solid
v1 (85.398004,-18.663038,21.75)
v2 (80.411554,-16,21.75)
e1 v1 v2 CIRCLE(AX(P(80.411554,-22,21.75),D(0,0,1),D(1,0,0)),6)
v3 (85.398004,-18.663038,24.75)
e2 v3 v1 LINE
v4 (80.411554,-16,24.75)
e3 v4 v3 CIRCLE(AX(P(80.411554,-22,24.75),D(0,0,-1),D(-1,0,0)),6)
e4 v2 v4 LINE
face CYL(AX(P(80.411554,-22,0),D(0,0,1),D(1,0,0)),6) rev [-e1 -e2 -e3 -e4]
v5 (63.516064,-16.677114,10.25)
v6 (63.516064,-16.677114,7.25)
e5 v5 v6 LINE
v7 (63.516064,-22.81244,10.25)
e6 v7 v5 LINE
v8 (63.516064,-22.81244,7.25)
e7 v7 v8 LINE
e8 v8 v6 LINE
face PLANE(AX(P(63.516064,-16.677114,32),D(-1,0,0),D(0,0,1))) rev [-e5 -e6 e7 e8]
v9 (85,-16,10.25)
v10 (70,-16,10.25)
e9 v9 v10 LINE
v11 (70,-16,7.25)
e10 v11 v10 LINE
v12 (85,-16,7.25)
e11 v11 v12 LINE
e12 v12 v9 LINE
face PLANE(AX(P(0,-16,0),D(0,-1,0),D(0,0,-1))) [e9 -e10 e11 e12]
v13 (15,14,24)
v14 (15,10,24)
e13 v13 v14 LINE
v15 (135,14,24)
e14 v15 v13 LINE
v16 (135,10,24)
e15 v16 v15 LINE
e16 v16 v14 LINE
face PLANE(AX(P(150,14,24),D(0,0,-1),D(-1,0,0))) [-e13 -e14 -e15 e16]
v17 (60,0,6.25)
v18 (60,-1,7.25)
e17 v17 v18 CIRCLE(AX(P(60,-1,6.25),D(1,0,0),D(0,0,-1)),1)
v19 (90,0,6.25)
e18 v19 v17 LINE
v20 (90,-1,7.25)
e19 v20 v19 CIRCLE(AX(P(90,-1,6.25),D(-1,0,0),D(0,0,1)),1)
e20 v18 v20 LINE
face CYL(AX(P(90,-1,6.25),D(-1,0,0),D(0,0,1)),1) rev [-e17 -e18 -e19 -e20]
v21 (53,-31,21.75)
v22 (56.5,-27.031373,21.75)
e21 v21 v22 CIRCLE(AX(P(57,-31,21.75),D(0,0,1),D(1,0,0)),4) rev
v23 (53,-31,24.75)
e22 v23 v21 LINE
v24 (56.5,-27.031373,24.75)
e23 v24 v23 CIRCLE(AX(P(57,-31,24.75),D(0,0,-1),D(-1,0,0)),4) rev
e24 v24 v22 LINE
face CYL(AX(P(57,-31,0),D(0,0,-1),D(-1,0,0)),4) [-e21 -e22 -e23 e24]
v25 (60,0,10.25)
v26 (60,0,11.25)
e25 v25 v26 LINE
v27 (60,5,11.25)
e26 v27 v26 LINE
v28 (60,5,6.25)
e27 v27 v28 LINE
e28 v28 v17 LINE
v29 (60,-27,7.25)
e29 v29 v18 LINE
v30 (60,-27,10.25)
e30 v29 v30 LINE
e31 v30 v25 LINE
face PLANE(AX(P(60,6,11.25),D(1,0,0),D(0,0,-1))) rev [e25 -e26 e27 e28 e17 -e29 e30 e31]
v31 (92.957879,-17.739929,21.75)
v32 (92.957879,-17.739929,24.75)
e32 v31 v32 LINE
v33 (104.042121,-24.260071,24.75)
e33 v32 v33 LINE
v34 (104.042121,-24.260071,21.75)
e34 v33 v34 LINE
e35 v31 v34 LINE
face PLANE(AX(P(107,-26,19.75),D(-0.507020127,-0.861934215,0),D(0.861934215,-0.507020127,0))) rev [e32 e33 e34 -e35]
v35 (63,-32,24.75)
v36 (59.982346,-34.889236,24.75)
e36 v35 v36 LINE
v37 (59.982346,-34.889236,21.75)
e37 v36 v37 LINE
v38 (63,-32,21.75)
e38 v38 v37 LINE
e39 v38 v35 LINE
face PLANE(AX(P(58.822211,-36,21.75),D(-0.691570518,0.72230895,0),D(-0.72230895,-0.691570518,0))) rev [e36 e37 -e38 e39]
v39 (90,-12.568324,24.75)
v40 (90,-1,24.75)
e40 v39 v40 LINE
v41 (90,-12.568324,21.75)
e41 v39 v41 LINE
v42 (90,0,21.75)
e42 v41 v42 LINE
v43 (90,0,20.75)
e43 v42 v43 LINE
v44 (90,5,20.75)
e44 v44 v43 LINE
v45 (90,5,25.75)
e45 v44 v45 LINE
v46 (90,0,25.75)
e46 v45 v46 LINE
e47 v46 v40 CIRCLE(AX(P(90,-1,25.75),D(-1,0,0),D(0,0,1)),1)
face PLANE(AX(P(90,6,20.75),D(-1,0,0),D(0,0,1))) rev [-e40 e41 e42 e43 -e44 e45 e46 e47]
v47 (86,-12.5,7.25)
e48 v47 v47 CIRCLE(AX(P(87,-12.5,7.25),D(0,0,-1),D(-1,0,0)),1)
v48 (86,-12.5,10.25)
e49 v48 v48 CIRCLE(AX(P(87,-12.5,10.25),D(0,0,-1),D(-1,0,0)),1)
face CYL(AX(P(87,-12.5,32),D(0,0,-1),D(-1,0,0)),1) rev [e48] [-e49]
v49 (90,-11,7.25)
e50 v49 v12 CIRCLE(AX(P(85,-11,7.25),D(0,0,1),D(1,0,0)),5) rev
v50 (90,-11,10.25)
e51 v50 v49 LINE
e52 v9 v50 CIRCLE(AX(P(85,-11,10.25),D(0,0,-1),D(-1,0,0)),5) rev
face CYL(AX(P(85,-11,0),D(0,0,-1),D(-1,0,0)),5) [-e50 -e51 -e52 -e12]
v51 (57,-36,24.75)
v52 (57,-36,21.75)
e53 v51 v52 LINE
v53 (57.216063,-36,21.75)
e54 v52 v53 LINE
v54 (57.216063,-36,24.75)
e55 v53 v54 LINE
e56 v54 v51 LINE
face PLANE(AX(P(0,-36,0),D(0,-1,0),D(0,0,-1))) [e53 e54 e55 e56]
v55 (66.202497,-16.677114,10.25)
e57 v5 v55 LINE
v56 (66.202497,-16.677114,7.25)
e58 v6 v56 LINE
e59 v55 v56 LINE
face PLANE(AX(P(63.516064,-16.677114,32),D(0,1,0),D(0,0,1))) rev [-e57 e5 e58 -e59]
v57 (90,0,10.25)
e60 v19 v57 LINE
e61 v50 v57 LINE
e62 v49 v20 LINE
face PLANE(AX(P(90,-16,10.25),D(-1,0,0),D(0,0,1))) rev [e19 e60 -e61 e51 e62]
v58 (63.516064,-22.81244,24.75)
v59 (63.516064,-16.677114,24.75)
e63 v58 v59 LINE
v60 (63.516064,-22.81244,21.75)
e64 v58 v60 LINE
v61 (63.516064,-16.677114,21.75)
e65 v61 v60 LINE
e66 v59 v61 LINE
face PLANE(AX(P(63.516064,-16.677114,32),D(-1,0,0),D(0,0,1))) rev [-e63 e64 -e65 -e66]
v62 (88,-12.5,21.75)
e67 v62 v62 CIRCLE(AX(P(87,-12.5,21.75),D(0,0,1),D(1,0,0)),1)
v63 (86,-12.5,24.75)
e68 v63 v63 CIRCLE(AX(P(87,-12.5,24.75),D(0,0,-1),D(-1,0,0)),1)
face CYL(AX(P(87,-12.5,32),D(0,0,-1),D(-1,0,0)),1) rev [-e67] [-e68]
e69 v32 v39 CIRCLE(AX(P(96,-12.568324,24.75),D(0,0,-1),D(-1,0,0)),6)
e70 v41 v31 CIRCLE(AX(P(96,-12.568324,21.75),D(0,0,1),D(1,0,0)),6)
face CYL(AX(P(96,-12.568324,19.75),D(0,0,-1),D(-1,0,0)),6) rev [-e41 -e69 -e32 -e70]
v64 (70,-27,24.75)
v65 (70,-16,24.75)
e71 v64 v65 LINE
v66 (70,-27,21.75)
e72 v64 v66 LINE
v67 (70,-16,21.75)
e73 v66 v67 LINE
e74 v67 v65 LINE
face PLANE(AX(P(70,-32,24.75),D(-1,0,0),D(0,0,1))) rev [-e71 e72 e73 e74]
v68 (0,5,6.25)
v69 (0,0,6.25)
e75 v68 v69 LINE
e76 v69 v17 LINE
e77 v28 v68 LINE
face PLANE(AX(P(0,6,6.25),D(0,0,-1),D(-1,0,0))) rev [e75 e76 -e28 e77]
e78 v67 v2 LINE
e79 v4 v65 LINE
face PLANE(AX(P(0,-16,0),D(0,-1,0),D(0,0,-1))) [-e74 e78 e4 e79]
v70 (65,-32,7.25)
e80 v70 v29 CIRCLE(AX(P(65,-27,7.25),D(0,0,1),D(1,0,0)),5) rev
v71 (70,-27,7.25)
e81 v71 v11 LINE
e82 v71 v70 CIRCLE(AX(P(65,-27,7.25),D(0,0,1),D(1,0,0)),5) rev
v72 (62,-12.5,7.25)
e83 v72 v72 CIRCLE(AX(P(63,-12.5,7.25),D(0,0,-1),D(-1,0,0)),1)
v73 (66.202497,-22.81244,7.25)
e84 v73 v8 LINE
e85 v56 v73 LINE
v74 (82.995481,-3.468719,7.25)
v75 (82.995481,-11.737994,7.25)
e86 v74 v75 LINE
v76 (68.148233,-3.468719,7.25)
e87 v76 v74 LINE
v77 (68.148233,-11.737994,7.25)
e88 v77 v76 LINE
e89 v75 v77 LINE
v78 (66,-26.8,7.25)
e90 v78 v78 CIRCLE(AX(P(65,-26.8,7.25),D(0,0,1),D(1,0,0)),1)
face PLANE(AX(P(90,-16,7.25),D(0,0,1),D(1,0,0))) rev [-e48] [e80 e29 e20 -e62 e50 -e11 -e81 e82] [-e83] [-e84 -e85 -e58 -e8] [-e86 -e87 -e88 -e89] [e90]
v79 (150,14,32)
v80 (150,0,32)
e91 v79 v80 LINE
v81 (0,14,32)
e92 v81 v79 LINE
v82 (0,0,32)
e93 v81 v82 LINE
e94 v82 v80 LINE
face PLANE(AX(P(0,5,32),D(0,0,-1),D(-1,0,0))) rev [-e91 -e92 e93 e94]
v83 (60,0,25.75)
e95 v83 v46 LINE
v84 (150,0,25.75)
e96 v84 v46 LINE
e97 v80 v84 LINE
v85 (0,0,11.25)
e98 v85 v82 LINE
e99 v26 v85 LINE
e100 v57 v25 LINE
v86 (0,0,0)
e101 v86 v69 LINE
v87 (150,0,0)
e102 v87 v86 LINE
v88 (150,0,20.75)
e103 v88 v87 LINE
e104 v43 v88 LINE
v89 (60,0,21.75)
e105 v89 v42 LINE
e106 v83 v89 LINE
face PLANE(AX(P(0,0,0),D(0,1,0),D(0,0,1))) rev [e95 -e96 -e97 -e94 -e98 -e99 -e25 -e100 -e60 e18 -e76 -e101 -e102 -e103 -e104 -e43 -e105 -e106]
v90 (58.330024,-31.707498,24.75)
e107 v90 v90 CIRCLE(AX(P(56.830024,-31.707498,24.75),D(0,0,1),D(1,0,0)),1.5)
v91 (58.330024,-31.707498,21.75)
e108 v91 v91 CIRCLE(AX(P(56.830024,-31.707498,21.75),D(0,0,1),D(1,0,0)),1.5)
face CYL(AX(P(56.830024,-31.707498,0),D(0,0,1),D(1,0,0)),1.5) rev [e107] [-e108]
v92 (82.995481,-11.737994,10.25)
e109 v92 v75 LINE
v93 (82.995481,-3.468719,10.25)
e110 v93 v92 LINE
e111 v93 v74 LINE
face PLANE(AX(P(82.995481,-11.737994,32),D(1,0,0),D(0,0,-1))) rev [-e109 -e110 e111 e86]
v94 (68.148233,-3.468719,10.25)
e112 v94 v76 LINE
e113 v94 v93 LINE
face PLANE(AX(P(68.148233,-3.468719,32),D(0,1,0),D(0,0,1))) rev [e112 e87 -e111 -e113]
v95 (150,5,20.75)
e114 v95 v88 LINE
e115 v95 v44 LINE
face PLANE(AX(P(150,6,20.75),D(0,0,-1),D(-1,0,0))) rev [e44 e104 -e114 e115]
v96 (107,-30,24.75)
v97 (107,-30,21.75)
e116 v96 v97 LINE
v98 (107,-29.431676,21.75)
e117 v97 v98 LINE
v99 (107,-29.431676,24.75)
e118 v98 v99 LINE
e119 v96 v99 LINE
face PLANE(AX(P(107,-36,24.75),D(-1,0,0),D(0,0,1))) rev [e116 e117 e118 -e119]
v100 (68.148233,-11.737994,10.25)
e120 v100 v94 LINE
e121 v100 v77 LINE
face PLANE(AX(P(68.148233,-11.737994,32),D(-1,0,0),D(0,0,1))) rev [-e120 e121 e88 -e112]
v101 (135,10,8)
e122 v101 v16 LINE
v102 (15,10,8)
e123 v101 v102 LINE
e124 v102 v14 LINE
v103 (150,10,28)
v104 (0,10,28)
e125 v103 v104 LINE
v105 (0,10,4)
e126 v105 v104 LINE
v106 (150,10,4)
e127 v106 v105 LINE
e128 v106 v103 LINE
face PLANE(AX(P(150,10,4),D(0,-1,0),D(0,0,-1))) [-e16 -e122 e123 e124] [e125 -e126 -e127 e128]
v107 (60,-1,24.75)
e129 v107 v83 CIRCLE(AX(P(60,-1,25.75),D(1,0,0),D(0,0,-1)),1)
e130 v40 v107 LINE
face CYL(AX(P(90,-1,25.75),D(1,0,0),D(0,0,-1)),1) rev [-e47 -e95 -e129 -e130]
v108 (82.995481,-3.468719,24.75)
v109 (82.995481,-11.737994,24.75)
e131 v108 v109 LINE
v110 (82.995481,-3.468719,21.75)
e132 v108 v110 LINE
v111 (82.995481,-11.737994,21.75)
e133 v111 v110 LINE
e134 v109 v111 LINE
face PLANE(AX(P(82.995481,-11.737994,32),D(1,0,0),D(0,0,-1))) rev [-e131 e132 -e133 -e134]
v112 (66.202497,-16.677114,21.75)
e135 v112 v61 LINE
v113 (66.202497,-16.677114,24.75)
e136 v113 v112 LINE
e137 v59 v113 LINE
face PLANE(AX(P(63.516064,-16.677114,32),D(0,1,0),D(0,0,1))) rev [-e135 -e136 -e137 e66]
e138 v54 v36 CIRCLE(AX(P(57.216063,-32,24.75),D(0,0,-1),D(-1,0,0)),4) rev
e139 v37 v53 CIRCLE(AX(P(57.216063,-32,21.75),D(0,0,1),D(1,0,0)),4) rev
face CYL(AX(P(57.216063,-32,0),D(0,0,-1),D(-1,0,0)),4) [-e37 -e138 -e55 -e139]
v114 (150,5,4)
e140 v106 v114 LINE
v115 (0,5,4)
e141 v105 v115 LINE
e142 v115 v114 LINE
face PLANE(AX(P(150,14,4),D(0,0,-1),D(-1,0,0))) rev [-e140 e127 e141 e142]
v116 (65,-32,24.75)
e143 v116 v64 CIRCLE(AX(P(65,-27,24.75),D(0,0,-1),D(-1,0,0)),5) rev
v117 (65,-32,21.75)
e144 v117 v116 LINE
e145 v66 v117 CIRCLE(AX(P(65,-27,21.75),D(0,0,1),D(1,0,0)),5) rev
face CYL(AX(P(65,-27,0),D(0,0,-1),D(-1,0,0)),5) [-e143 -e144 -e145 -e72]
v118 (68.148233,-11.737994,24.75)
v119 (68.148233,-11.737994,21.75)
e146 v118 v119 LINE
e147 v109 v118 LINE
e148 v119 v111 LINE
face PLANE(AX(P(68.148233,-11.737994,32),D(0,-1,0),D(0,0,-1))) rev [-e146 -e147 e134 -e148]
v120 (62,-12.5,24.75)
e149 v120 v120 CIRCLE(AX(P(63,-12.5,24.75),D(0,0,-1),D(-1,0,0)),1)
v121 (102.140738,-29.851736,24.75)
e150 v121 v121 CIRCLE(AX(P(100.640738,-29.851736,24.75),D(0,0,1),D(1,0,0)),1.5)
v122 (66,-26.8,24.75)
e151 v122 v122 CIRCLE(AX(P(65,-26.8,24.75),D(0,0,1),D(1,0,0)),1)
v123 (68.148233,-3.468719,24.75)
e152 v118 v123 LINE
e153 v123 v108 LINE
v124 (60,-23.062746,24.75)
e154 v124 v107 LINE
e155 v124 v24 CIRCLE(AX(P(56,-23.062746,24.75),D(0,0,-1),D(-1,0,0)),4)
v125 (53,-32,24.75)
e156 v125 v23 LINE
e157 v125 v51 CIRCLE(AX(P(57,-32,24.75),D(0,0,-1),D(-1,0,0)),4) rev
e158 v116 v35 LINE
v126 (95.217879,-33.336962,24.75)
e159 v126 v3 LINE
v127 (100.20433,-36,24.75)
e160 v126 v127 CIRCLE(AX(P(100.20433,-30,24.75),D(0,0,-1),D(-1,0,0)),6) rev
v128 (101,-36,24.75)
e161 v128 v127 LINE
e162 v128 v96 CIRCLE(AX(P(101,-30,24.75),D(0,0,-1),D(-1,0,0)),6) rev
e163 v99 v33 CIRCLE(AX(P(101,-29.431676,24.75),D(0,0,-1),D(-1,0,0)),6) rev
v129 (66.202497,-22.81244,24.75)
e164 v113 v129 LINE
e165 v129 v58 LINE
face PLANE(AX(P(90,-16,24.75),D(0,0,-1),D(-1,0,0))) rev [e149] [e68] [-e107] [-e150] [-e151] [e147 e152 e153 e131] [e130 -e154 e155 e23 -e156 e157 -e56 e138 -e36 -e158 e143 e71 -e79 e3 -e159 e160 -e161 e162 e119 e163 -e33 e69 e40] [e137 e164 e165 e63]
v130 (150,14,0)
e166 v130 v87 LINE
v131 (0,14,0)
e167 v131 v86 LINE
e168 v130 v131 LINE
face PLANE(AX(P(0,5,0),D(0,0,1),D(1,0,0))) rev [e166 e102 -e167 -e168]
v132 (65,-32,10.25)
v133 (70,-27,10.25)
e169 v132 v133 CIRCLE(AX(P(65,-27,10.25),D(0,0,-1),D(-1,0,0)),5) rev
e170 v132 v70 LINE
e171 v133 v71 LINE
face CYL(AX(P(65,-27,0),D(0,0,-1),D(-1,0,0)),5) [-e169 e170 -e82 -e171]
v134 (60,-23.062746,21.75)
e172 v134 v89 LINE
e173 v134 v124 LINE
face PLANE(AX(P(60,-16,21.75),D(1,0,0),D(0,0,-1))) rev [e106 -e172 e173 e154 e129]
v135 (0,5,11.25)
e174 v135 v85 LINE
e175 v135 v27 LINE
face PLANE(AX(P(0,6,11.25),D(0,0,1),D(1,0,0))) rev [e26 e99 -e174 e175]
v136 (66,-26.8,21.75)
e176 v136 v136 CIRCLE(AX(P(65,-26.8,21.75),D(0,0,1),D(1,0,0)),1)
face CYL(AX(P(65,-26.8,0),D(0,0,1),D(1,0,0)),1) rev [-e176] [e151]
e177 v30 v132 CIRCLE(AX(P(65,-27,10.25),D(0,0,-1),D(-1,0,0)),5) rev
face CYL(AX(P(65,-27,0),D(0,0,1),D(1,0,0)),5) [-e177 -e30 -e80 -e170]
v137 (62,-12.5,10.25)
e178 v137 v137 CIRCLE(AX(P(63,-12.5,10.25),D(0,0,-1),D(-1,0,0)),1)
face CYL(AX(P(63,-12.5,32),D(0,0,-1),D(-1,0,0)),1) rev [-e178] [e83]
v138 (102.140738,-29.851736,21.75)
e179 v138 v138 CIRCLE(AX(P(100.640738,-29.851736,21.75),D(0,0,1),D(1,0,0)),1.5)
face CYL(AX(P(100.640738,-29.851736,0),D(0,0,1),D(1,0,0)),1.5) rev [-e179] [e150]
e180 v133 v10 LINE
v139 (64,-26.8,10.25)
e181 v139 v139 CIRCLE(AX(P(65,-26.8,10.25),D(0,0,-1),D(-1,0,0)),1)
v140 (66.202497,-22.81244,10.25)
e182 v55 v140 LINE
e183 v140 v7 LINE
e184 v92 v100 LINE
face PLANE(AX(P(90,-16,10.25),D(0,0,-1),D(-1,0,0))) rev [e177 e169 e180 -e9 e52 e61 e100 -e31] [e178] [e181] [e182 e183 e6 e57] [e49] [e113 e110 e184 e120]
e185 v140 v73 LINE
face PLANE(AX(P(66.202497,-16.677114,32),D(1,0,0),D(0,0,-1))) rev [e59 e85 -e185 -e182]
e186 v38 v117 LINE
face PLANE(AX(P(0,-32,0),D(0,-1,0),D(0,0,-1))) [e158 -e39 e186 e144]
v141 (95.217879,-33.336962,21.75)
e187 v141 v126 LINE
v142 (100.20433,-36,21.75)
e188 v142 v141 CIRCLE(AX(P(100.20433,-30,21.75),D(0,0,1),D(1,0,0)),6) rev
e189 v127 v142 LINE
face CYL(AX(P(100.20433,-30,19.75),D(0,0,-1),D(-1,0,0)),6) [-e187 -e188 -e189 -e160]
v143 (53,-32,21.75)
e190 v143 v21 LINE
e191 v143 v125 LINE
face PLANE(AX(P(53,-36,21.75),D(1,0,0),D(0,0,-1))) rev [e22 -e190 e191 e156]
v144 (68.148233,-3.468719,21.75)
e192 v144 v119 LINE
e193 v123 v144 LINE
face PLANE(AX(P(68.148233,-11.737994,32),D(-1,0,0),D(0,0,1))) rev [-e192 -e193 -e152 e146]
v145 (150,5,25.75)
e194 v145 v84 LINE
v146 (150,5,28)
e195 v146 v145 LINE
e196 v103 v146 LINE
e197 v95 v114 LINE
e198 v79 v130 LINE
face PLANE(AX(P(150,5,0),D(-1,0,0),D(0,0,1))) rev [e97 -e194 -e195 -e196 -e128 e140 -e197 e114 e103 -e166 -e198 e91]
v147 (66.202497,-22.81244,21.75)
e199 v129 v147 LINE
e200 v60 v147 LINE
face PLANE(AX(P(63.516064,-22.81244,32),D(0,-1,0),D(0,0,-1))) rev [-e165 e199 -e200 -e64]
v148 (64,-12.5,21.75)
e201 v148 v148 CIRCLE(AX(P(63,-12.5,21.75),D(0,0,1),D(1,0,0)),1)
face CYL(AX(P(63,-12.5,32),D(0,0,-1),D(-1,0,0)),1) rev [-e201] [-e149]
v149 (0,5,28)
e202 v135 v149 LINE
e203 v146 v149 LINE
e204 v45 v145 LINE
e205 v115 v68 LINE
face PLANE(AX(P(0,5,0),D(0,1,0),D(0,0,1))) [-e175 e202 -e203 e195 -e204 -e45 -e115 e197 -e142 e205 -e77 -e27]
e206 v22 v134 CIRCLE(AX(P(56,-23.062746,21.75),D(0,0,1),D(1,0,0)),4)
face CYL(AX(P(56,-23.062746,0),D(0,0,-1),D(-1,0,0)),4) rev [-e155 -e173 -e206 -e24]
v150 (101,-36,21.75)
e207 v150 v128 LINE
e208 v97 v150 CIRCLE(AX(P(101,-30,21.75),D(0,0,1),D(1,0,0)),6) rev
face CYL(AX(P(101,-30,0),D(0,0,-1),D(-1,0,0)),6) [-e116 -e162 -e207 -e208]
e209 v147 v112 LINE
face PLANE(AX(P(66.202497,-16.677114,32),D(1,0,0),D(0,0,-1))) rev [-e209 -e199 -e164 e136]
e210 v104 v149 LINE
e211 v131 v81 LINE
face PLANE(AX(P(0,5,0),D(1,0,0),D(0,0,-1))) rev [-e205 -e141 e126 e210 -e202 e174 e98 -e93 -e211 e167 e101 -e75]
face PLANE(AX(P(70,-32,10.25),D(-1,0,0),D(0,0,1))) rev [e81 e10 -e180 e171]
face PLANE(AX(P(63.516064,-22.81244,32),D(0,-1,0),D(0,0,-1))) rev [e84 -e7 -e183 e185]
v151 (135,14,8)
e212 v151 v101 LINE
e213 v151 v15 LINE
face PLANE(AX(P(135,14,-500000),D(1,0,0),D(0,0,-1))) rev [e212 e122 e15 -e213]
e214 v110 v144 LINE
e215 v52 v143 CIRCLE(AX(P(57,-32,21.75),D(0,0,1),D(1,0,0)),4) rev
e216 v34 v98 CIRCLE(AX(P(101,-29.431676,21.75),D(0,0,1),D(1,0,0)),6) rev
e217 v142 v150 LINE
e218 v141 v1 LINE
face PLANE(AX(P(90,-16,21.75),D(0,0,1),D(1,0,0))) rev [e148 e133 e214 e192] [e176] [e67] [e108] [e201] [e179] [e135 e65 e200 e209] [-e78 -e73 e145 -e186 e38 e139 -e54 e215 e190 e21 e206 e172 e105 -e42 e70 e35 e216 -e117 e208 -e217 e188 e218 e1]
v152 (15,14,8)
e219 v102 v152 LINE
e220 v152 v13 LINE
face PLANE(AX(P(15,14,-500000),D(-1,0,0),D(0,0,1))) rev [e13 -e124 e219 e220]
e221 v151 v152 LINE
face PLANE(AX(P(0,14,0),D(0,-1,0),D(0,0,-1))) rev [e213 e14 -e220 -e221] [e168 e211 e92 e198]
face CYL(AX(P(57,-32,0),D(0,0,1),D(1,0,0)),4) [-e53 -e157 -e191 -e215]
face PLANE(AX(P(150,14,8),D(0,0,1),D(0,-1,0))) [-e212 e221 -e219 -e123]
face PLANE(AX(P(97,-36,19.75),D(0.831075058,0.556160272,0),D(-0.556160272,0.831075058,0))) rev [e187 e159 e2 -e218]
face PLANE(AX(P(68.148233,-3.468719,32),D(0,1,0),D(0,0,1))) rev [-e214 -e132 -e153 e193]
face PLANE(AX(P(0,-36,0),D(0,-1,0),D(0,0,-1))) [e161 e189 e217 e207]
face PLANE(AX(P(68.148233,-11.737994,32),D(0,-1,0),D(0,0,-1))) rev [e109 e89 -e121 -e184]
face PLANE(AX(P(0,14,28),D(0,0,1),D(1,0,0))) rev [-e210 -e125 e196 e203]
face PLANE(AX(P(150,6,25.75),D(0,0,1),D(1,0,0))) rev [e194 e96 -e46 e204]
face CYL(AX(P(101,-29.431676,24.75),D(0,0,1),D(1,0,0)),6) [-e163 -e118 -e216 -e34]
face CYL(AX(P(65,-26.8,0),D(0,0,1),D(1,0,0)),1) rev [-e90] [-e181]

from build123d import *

# Parameters (mm, degrees)
SKETCH1_W            = 150
SKETCH1_H            = 32
BOSS_EXTRUDE1_DEPTH  = 5
SKETCH2_W            = 150
SKETCH2_H            = 4
BOSS_EXTRUDE2_DEPTH  = 9
SKETCH4_W            = 4
SKETCH4_H            = 4
BOSS_EXTRUDE3_DEPTH  = 150
SKETCH5_W            = 60
SKETCH5_H            = 5
CUT_EXTRUDE1_DEPTH   = 6
BOSS_EXTRUDE4_REACH  = 154.552
SKETCH6_W            = 15
SKETCH6_H            = 4
SKETCH7_W            = 60
SKETCH7_H            = 5
CUT_EXTRUDE2_DEPTH   = 6
SKETCH8_W            = 30
SKETCH8_H            = 3
BOSS_EXTRUDE5_DEPTH  = 16
SKETCH9_R            = 1
CUT_EXTRUDE3_DEPTH   = 153.867794188
SKETCH11_W           = 10
SKETCH11_H           = 3
BOSS_EXTRUDE7_DEPTH  = 16
SKETCH12_R           = 1
CUT_EXTRUDE4_DEPTH   = 156.359462216
SKETCH13_W           = 20
SKETCH13_H           = 3
BOSS_EXTRUDE8_DEPTH  = 20
SKETCH14_W           = 10
SKETCH14_H           = 3
BOSS_EXTRUDE9_DEPTH  = 4
SKETCH15_W           = 7
SKETCH15_H           = 3
BOSS_EXTRUDE10_DEPTH = 5
SKETCH16_R           = 1.5
CUT_EXTRUDE5_DEPTH   = 157.232399009
CUT_EXTRUDE6_DEPTH   = 5
CUT_EXTRUDE7_DEPTH   = 5
BOSS_EXTRUDE11_DEPTH = 3
CUT_EXTRUDE8_DEPTH   = 3
SKETCH21_W           = 14.847248178
SKETCH21_H           = 8.269274671
CUT_EXTRUDE9_DEPTH   = 157.232399009
FILLET3_R            = 6
FILLET4_R            = 4
FILLET5_R            = 5
FILLET6_R            = 5
SKETCH22_W           = 2.686432883
SKETCH22_H           = 6.135326584
CUT_EXTRUDE10_DEPTH  = 157.232399009
FILLET7_R            = 6
FILLET8_R            = 6
FILLET9_R            = 4
FILLET10_R           = 1
FILLET11_R           = 1


with BuildPart() as part:
    # Sketch1 → Boss-Extrude1 (new body)
    with BuildSketch(Plane(origin=(0, 0, 0), x_dir=(1, 0, 0), z_dir=(0, 1, 0))):
        with Locations((75, -16)):
            Rectangle(SKETCH1_W, SKETCH1_H)
    extrude(amount=BOSS_EXTRUDE1_DEPTH)

    # Sketch2 → Boss-Extrude2 (add)
    with BuildSketch(Plane(origin=(0, 5, 0), x_dir=(1, 0, 0), z_dir=(0, 1, 0))):
        with Locations((75, -30)):
            Rectangle(SKETCH2_W, SKETCH2_H)
        with Locations((75, -2)):
            Rectangle(SKETCH2_W, SKETCH2_H)
    extrude(amount=BOSS_EXTRUDE2_DEPTH)

    # Sketch4 → Boss-Extrude3 (add)
    with BuildSketch(Plane.ZY):
        with Locations((6, 12)):
            Rectangle(SKETCH4_W, SKETCH4_H)
        with Locations((26, 12)):
            Rectangle(SKETCH4_W, SKETCH4_H)
    extrude(amount=-BOSS_EXTRUDE3_DEPTH)

    # Sketch5 → Cut-Extrude1 (cut)
    with BuildSketch(Plane(origin=(0, 0, 0), x_dir=(-1, 0, 0), z_dir=(0, -1, 0))):
        with Locations((-120, -23.25)):
            Rectangle(SKETCH5_W, SKETCH5_H)
    extrude(amount=-CUT_EXTRUDE1_DEPTH, mode=Mode.SUBTRACT)

    # Sketch6 → Boss-Extrude4 (add, up to next)
    with BuildSketch(Plane(origin=(0, 0, 24), x_dir=(-1, 0, 0), z_dir=(0, 0, -1)), mode=Mode.PRIVATE) as boss_extrude4_sk1:
        with Locations((-142.5, 12)):
            Rectangle(SKETCH6_W, SKETCH6_H)
    boss_extrude4_tool1 = extrude(boss_extrude4_sk1.sketch, amount=BOSS_EXTRUDE4_REACH, mode=Mode.PRIVATE) - part.part
    # Sketch6 → Boss-Extrude4 (add, up to next)
    with BuildSketch(Plane(origin=(0, 0, 24), x_dir=(-1, 0, 0), z_dir=(0, 0, -1)), mode=Mode.PRIVATE) as boss_extrude4_sk2:
        with Locations((-7.5, 12)):
            Rectangle(SKETCH6_W, SKETCH6_H)
    boss_extrude4_tool2 = extrude(boss_extrude4_sk2.sketch, amount=BOSS_EXTRUDE4_REACH, mode=Mode.PRIVATE) - part.part
    add(boss_extrude4_tool1.solids().sort_by_distance((142.5, 12, 24))[0])
    add(boss_extrude4_tool2.solids().sort_by_distance((7.5, 12, 24))[0])

    # Sketch7 → Cut-Extrude2 (cut)
    with BuildSketch(Plane(origin=(0, 0, 0), x_dir=(-1, 0, 0), z_dir=(0, -1, 0))):
        with Locations((-30, -8.75)):
            Rectangle(SKETCH7_W, SKETCH7_H)
    extrude(amount=-CUT_EXTRUDE2_DEPTH, mode=Mode.SUBTRACT)

    # Sketch8 → Boss-Extrude5 (add)
    with BuildSketch(Plane.XZ):
        with Locations((75, 23.25)):
            Rectangle(SKETCH8_W, SKETCH8_H)
        with Locations((75, 8.75)):
            Rectangle(SKETCH8_W, SKETCH8_H)
    extrude(amount=BOSS_EXTRUDE5_DEPTH)

    # Sketch9 → Cut-Extrude3 (cut, through all)
    with BuildSketch(Plane(origin=(0, 0, 7.25), x_dir=(-1, 0, 0), z_dir=(0, 0, -1))):
        with Locations((-63, -12.5)):
            Circle(SKETCH9_R)
        with Locations((-87, -12.5)):
            Circle(SKETCH9_R)
    extrude(amount=-CUT_EXTRUDE3_DEPTH, mode=Mode.SUBTRACT)

    # Sketch11 → Boss-Extrude7 (add)
    with BuildSketch(Plane(origin=(0, -16, 0), x_dir=(-1, 0, 0), z_dir=(0, -1, 0))):
        with Locations((-65, -8.75)):
            Rectangle(SKETCH11_W, SKETCH11_H)
        with Locations((-65, -23.25)):
            Rectangle(SKETCH11_W, SKETCH11_H)
    extrude(amount=BOSS_EXTRUDE7_DEPTH)

    # Sketch12 → Cut-Extrude4 (cut, through all)
    with BuildSketch(Plane.XY.offset(24.75)):
        with Locations((65, -26.8)):
            Circle(SKETCH12_R)
    extrude(amount=-CUT_EXTRUDE4_DEPTH, mode=Mode.SUBTRACT)

    # Sketch13 → Boss-Extrude8 (add)
    with BuildSketch(Plane(origin=(0, -16, 0), x_dir=(-1, 0, 0), z_dir=(0, -1, 0))):
        with Locations((-97, -23.25)):
            Rectangle(SKETCH13_W, SKETCH13_H)
    extrude(amount=BOSS_EXTRUDE8_DEPTH)

    # Sketch14 → Boss-Extrude9 (add)
    with BuildSketch(Plane(origin=(0, -32, 0), x_dir=(-1, 0, 0), z_dir=(0, -1, 0))):
        with Locations((-58, -23.25)):
            Rectangle(SKETCH14_W, SKETCH14_H)
    extrude(amount=BOSS_EXTRUDE9_DEPTH)

    # Sketch15 → Boss-Extrude10 (add)
    with BuildSketch(Plane(origin=(0, -32, 0), x_dir=(1, 0, 0), z_dir=(0, 1, 0))):
        with Locations((56.5, -23.25)):
            Rectangle(SKETCH15_W, SKETCH15_H)
    extrude(amount=BOSS_EXTRUDE10_DEPTH)

    # Sketch16 → Cut-Extrude5 (cut, through all)
    with BuildSketch(Plane.XY.offset(24.75)):
        with Locations((56.830024482, -31.707497886)):
            Circle(SKETCH16_R)
        with Locations((100.640738332, -29.851736065)):
            Circle(SKETCH16_R)
    extrude(amount=-CUT_EXTRUDE5_DEPTH, mode=Mode.SUBTRACT)

    # Sketch17 → Cut-Extrude6 (cut)
    with BuildSketch(Plane.XY.offset(24.75)):
        Polygon((97, -36), (87, -21.056914339), (87, -36), align=None)
    extrude(amount=-CUT_EXTRUDE6_DEPTH, mode=Mode.SUBTRACT)

    # Sketch18 → Cut-Extrude7 (cut)
    with BuildSketch(Plane.XY.offset(24.75)):
        Polygon((107, -26), (90, -16), (107, -16), align=None)
    extrude(amount=-CUT_EXTRUDE7_DEPTH, mode=Mode.SUBTRACT)

    # Sketch19 → Boss-Extrude11 (add)
    with BuildSketch(Plane.XY.offset(24.75)):
        Polygon((87, -21.056914339), (83.615883457, -16), (87, -16), align=None)
    extrude(amount=-BOSS_EXTRUDE11_DEPTH)

    # Sketch20 → Cut-Extrude8 (cut)
    with BuildSketch(Plane.XY.offset(24.75)):
        Polygon((58.822210862, -36), (63, -32), (63, -36), align=None)
    extrude(amount=-CUT_EXTRUDE8_DEPTH, mode=Mode.SUBTRACT)

    # Sketch21 → Cut-Extrude9 (cut, through all)
    with BuildSketch(Plane(origin=(0, 0, 7.25), x_dir=(-1, 0, 0), z_dir=(0, 0, -1))):
        with Locations((-75.571857051, -7.603356602)):
            Rectangle(SKETCH21_W, SKETCH21_H)
    extrude(amount=-CUT_EXTRUDE9_DEPTH, mode=Mode.SUBTRACT)

    # Fillet3
    fillet3_edges = [part.edges().sort_by_distance(p)[0] for p in [
        (107, -36, 23.25),
        (97, -36, 23.25),
        (107, -26, 23.25),
    ]]
    fillet(fillet3_edges, radius=FILLET3_R)

    # Fillet4
    fillet4_edges = [part.edges().sort_by_distance(p)[0] for p in [
        (53, -36, 23.25),
        (53, -27, 23.25),
        (58.822210862, -36, 23.25),
    ]]
    fillet(fillet4_edges, radius=FILLET4_R)

    # Fillet5
    fillet5_edges = [part.edges().sort_by_distance(p)[0] for p in [
        (90, -16, 8.75),
        (70, -32, 8.75),
        (60, -32, 8.75),
    ]]
    fillet(fillet5_edges, radius=FILLET5_R - 0.0001)  # a hair under: the kernel refuses the full size

    # Fillet6
    fillet6_edges = [part.edges().sort_by_distance(p)[0] for p in [
        (70, -32, 23.25),
    ]]
    fillet(fillet6_edges, radius=FILLET6_R)

    # Sketch22 → Cut-Extrude10 (cut, through all)
    with BuildSketch(Plane(origin=(0, 0, 7.25), x_dir=(-1, 0, 0), z_dir=(0, 0, -1))):
        with Locations((-64.85928039, -19.744776936)):
            Rectangle(SKETCH22_W, SKETCH22_H)
    extrude(amount=-CUT_EXTRUDE10_DEPTH, mode=Mode.SUBTRACT)

    # Fillet7
    fillet7_edges = [part.edges().sort_by_distance(p)[0] for p in [
        (90, -16, 23.25),
    ]]
    fillet(fillet7_edges, radius=FILLET7_R)

    # Fillet8
    fillet8_edges = [part.edges().sort_by_distance(p)[0] for p in [
        (83.615883457, -16, 23.25),
    ]]
    fillet(fillet8_edges, radius=FILLET8_R)

    # Fillet9
    fillet9_edges = [part.edges().sort_by_distance(p)[0] for p in [
        (60, -27, 23.25),
    ]]
    fillet(fillet9_edges, radius=FILLET9_R)

    # Fillet10
    fillet10_edges = [part.edges().sort_by_distance(p)[0] for p in [
        (75, 0, 7.25),
    ]]
    fillet(fillet10_edges, radius=FILLET10_R)

    # Fillet11
    fillet11_edges = [part.edges().sort_by_distance(p)[0] for p in [
        (75, 0, 24.75),
    ]]
    fillet(fillet11_edges, radius=FILLET11_R)


solid = part.part
